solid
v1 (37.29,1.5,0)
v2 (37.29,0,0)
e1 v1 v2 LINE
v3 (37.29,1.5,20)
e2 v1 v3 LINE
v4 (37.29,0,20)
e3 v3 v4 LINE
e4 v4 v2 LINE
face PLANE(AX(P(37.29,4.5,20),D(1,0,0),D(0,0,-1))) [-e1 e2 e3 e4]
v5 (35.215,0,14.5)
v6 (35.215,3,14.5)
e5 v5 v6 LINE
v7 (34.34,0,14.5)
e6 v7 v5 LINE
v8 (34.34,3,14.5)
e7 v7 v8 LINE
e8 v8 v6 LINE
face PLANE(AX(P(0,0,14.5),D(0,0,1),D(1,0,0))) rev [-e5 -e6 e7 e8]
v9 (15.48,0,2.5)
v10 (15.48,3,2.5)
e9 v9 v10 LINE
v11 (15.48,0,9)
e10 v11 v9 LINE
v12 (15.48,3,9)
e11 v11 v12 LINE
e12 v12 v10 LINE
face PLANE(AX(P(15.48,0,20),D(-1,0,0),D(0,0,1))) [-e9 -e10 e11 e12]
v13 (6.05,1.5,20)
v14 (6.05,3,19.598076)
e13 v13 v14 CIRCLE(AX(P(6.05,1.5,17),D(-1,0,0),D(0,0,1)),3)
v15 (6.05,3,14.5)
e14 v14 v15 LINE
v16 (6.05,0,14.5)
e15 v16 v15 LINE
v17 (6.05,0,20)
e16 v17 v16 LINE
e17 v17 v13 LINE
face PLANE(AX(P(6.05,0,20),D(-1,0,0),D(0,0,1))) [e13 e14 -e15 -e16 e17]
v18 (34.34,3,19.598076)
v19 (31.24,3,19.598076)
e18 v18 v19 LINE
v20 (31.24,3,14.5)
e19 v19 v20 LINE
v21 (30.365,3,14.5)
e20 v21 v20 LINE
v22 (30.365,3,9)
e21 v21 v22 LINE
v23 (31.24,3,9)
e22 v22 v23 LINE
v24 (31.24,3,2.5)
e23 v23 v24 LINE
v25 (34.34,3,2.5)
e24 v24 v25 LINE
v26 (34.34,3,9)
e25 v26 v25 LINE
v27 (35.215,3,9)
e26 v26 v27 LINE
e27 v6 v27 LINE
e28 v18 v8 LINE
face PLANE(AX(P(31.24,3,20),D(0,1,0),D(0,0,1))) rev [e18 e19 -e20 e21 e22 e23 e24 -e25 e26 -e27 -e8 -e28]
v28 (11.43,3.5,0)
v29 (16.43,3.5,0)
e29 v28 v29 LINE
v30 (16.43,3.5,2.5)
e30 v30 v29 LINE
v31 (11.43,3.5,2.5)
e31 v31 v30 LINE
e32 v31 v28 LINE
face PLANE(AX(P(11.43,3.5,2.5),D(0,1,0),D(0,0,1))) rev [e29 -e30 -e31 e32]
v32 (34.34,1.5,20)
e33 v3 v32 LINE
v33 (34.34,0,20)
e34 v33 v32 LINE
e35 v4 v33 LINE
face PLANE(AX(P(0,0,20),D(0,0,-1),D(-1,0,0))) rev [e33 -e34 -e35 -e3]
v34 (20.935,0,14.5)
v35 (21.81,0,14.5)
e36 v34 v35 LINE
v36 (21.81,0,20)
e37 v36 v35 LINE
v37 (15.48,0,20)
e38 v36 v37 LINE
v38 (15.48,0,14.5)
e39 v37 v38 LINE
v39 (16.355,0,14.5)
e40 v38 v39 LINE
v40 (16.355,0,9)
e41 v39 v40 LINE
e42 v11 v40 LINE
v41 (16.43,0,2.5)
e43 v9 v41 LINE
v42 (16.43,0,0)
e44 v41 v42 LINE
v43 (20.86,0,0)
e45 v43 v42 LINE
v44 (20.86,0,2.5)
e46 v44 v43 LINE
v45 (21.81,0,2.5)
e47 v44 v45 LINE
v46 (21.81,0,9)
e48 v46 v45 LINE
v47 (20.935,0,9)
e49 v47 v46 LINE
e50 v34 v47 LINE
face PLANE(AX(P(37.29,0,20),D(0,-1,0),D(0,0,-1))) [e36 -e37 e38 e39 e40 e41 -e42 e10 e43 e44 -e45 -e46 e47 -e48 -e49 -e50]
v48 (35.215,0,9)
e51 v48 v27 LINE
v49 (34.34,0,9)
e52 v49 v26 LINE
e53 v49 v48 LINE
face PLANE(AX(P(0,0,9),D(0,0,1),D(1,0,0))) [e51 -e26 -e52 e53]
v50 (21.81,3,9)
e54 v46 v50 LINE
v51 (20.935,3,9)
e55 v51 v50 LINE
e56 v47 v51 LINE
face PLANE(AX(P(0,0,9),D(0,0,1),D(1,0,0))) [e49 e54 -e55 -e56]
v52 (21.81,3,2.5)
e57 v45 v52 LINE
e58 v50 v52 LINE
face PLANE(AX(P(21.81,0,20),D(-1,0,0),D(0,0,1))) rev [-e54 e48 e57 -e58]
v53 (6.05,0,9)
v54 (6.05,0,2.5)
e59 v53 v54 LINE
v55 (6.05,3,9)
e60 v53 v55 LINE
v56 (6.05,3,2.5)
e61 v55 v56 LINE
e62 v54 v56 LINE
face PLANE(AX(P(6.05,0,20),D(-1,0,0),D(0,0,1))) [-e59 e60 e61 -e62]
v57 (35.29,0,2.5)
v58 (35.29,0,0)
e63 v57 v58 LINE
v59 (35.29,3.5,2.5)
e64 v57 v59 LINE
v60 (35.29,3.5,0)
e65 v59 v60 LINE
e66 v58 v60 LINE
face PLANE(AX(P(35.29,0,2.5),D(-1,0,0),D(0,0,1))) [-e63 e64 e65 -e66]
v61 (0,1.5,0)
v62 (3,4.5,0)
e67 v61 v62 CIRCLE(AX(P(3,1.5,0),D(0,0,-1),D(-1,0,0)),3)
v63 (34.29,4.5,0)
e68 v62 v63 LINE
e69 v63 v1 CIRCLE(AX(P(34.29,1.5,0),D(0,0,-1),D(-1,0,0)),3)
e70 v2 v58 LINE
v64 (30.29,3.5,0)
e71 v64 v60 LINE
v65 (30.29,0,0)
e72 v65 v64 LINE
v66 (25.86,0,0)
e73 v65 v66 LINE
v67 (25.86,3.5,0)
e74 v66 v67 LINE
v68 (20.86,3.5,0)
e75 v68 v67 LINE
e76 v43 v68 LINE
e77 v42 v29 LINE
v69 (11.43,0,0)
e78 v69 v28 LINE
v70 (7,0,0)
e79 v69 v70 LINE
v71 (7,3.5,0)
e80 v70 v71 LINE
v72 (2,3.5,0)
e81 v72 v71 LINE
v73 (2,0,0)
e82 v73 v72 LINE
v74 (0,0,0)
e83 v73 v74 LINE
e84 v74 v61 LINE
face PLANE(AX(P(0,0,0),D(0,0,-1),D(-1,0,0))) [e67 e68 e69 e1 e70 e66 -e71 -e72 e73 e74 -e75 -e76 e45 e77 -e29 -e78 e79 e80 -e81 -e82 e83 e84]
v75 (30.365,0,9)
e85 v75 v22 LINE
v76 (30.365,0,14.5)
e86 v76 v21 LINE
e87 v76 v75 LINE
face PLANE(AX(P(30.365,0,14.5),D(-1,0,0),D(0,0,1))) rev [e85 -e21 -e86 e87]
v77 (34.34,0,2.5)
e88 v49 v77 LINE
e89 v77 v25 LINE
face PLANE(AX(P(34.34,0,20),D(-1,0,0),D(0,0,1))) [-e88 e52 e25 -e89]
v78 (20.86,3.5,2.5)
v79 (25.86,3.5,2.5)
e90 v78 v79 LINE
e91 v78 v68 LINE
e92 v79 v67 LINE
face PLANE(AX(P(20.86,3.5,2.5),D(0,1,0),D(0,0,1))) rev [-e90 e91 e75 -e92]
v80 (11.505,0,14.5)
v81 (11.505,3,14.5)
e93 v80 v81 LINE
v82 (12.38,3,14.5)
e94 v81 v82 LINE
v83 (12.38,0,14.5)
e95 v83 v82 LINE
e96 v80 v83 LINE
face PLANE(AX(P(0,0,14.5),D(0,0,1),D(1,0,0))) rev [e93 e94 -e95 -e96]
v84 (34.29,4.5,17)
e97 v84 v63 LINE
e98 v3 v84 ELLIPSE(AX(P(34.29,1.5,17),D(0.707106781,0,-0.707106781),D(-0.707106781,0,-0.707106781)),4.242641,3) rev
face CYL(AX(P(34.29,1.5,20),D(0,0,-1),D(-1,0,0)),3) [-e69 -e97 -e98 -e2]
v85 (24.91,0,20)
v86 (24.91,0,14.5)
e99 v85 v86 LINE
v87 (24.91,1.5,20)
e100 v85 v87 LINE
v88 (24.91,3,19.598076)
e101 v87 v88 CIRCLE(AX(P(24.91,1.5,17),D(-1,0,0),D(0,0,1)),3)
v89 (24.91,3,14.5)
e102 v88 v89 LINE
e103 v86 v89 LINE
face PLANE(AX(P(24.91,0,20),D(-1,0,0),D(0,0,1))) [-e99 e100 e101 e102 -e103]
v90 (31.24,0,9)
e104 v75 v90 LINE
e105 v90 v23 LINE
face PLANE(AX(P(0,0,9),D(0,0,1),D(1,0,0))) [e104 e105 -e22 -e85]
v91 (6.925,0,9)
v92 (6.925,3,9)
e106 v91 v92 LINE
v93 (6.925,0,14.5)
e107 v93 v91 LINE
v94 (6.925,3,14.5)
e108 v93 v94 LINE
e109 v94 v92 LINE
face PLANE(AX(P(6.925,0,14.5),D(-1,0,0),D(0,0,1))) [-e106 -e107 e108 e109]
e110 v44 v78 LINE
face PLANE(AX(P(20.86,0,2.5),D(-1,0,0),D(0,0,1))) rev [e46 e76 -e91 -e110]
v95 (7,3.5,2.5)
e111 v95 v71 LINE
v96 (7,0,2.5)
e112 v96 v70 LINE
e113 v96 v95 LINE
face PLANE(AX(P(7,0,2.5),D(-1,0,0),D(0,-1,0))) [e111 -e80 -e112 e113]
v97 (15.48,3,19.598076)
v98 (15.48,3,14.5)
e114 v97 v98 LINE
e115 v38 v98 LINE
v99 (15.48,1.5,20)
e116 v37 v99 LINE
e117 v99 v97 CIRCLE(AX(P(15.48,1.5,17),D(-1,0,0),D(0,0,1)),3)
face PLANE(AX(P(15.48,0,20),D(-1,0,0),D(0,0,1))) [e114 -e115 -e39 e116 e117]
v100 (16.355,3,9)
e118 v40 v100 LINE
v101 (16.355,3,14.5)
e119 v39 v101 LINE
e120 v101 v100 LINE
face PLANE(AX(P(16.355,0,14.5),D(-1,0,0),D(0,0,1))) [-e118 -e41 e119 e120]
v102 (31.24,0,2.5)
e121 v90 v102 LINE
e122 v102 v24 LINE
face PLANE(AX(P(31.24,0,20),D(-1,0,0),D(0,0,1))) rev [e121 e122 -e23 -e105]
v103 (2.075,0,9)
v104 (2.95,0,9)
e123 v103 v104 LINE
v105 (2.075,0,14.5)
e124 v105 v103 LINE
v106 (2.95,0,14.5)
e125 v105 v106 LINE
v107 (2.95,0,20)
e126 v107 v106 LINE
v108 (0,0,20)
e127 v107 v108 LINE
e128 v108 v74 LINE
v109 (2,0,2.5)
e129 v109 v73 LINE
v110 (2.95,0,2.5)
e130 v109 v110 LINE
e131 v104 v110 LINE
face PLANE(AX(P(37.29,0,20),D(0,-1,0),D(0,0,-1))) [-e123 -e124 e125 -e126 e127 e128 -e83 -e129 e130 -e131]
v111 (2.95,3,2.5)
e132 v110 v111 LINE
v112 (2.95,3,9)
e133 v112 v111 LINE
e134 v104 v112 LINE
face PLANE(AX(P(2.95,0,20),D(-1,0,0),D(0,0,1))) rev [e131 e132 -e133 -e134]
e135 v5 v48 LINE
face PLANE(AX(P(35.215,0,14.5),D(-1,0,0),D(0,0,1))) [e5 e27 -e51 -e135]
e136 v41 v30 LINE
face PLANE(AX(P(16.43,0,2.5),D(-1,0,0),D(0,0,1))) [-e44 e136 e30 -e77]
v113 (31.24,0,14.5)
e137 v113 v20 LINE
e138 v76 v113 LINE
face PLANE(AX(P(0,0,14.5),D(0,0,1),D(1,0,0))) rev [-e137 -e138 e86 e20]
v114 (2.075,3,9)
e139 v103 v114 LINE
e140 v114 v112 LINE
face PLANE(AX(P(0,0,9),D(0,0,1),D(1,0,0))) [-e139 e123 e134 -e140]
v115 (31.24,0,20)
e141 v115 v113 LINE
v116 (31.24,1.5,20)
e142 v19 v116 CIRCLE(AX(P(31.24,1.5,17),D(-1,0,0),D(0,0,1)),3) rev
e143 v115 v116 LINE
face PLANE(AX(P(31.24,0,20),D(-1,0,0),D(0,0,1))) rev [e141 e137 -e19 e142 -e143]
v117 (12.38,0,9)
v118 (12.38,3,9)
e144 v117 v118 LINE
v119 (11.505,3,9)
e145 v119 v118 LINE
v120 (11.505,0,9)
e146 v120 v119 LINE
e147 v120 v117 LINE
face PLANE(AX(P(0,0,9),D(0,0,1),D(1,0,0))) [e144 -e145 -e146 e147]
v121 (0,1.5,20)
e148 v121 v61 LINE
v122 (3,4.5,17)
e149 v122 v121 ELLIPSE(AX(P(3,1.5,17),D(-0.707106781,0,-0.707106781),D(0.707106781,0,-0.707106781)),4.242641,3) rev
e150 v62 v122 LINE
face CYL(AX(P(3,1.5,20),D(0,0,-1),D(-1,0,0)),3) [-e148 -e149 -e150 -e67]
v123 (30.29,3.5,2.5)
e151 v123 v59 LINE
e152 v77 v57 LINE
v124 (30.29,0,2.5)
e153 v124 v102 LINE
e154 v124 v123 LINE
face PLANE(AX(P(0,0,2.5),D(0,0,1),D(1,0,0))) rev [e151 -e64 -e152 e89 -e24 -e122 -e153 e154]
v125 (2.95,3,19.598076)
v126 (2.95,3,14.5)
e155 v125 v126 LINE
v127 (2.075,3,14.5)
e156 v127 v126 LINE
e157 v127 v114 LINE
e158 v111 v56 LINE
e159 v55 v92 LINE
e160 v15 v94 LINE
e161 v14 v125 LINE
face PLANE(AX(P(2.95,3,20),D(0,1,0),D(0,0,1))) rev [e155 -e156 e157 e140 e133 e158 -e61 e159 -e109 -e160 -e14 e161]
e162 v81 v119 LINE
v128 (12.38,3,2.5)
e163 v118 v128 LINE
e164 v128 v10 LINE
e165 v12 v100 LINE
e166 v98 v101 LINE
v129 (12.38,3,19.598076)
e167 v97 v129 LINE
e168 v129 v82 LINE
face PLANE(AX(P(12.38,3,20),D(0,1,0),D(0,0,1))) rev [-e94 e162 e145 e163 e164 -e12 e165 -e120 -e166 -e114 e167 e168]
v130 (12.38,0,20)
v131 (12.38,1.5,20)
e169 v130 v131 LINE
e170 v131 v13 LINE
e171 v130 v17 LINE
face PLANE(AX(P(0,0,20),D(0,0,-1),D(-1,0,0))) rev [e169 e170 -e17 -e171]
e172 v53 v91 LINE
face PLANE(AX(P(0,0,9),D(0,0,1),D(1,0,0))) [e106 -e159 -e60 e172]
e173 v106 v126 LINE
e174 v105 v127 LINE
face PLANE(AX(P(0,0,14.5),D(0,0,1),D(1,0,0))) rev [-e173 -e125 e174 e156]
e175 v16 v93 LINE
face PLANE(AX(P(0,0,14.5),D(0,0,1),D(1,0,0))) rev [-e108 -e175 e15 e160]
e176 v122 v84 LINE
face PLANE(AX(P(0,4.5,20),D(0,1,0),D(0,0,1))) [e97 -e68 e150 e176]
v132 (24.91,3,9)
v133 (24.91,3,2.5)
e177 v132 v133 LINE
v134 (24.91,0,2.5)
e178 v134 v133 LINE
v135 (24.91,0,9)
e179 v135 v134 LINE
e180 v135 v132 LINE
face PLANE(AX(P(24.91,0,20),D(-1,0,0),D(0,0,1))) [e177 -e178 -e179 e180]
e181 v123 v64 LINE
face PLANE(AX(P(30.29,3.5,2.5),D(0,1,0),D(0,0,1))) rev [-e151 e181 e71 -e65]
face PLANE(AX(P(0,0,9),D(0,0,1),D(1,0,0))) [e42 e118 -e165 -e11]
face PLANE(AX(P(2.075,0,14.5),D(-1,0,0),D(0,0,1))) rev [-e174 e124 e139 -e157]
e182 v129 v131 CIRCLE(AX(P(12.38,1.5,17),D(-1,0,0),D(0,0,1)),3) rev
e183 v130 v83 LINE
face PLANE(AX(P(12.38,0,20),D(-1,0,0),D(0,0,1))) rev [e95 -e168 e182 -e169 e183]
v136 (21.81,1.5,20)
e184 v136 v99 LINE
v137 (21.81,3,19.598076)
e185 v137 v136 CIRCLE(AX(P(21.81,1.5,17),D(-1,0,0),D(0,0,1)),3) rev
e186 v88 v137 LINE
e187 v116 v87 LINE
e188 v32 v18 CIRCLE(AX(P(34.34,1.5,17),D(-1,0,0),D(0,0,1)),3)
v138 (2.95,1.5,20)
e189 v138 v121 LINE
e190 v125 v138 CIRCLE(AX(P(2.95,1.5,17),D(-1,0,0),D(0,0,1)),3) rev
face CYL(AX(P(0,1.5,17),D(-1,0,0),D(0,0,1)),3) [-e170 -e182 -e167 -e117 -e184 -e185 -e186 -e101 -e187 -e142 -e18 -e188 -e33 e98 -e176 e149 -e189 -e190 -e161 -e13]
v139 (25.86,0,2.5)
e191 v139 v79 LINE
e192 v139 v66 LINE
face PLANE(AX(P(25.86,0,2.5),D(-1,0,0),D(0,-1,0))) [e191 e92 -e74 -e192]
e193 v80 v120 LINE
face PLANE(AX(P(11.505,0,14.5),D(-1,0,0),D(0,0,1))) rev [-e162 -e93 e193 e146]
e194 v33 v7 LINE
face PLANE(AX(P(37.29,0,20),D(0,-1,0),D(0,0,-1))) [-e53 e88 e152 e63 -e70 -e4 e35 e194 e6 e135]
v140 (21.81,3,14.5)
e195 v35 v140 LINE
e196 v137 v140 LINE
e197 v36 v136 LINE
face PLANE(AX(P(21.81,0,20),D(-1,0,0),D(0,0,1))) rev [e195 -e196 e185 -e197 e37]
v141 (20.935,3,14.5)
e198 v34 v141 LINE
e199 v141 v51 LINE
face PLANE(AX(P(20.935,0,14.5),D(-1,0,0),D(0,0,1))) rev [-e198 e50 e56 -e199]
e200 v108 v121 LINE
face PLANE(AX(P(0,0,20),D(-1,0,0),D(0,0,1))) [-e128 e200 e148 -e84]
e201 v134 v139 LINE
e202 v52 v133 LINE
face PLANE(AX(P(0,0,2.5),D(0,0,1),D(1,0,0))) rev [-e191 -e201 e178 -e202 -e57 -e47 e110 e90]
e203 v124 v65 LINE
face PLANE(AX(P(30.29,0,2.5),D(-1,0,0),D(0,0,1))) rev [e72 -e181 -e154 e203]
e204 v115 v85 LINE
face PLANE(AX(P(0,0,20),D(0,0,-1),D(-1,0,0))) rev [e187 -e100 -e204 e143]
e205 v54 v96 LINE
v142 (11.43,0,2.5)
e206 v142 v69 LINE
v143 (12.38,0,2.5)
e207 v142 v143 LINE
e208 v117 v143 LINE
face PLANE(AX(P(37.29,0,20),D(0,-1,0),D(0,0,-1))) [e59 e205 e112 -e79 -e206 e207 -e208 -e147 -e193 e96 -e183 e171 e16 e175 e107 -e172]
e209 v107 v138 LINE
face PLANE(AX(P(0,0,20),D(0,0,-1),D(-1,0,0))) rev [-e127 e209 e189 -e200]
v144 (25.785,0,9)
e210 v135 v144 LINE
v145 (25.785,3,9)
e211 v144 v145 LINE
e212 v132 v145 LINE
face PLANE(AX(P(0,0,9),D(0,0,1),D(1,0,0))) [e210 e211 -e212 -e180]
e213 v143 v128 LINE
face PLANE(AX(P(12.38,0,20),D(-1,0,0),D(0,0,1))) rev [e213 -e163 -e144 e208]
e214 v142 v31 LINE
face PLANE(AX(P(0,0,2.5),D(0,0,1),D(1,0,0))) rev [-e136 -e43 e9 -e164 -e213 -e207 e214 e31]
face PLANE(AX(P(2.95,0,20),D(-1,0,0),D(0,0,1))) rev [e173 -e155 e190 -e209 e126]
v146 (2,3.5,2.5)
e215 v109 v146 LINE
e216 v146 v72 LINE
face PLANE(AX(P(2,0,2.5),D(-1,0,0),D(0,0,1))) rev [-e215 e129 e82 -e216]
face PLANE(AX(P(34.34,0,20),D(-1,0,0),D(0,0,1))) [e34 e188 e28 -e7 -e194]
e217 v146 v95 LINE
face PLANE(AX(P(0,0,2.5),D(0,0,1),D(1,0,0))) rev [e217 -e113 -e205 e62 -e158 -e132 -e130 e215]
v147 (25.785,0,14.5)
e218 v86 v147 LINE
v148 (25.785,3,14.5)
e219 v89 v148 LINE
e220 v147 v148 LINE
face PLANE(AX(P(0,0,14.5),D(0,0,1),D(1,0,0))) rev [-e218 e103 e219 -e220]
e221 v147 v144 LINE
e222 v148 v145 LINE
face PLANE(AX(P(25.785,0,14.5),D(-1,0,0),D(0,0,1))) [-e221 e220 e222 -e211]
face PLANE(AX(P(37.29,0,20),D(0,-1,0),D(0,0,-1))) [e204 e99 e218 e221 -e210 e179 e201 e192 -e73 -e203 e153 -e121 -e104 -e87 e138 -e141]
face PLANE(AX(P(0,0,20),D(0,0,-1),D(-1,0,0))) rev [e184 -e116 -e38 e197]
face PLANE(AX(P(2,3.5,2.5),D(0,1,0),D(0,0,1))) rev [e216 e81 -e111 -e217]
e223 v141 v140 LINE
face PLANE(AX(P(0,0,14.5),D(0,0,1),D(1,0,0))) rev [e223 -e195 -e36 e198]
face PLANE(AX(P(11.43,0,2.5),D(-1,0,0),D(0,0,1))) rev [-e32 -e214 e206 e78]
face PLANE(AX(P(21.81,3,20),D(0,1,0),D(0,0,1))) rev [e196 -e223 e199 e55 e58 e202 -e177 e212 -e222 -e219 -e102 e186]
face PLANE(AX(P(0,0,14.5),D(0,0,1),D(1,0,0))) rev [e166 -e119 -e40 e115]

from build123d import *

# Parameters (mm, degrees)
SKETCH1_W               = 37.29
SKETCH1_H               = 4.5
BOSS_EXTRUDE1_DEPTH     = 20
CUT_EXTRUDE1_DEPTH      = 43.553426419
CUT_EXTRUDE1_DEPTH_BACK = 43.553426419
SKETCH1_3_W             = 3.1
SKETCH1_3_H             = 3
CUT_EXTRUDE2_START      = 9
SKETCH1_4_W             = 4.85
SKETCH1_4_H             = 3
CUT_EXTRUDE2_DEPTH      = 5.5
SKETCH1_5_W             = 5
SKETCH1_5_H             = 3.5
CUT_EXTRUDE3_DEPTH      = 2.5
FILLET1_R               = 3


with BuildPart() as part:
    # Sketch1 → Boss-Extrude1 (new body)
    with BuildSketch(Plane.XY):
        with Locations((18.645, 2.25)):
            Rectangle(SKETCH1_W, SKETCH1_H)
    extrude(amount=BOSS_EXTRUDE1_DEPTH)

    # Sketch1<3> → Cut-Extrude1 (cut, two sides: drawn at the far end of the back side and taken through both)
    with BuildSketch(Plane.XY.offset(-CUT_EXTRUDE1_DEPTH_BACK)):
        with Locations((4.5, 1.5)):
            Rectangle(SKETCH1_3_W, SKETCH1_3_H)
        with Locations((13.93, 1.5)):
            Rectangle(SKETCH1_3_W, SKETCH1_3_H)
        with Locations((23.36, 1.5)):
            Rectangle(SKETCH1_3_W, SKETCH1_3_H)
        with Locations((32.79, 1.5)):
            Rectangle(SKETCH1_3_W, SKETCH1_3_H)
    extrude(amount=CUT_EXTRUDE1_DEPTH + CUT_EXTRUDE1_DEPTH_BACK, mode=Mode.SUBTRACT)

    # Sketch1<4> → Cut-Extrude2 (cut)
    with BuildSketch(Plane.XY.offset(CUT_EXTRUDE2_START)):
        with Locations((4.5, 1.5)):
            Rectangle(SKETCH1_4_W, SKETCH1_4_H)
        with Locations((13.93, 1.5)):
            Rectangle(SKETCH1_4_W, SKETCH1_4_H)
        with Locations((23.36, 1.5)):
            Rectangle(SKETCH1_4_W, SKETCH1_4_H)
        with Locations((32.79, 1.5)):
            Rectangle(SKETCH1_4_W, SKETCH1_4_H)
    extrude(amount=CUT_EXTRUDE2_DEPTH, mode=Mode.SUBTRACT)

    # Sketch1<5> → Cut-Extrude3 (cut)
    with BuildSketch(Plane.XY):
        with Locations((4.5, 1.75)):
            Rectangle(SKETCH1_5_W, SKETCH1_5_H)
        with Locations((13.93, 1.75)):
            Rectangle(SKETCH1_5_W, SKETCH1_5_H)
        with Locations((23.36, 1.75)):
            Rectangle(SKETCH1_5_W, SKETCH1_5_H)
        with Locations((32.79, 1.75)):
            Rectangle(SKETCH1_5_W, SKETCH1_5_H)
    extrude(amount=CUT_EXTRUDE3_DEPTH, mode=Mode.SUBTRACT)

    # Fillet1
    # the kernel refuses this fillet: 3 mm, written as the material it takes off along each edge
    with BuildSketch(Plane(origin=(-7.5, 4.5, 20), x_dir=(0, 0, -1), z_dir=(1, 0, 0))) as fillet1_piece_1:
        with BuildLine():
            CenterArc((FILLET1_R, -FILLET1_R), FILLET1_R, 90, 90)
            Line((0, -FILLET1_R), (0, 0))
            Line((0, 0), (FILLET1_R, 0))
        make_face()
    extrude(amount=52.29, mode=Mode.SUBTRACT)
    with BuildSketch(Plane(origin=(37.29, 4.5, -7.5), x_dir=(-1, 0, 0), z_dir=(0, 0, 1)), Plane(origin=(0, 4.5, -7.5), x_dir=(0, -1, 0), z_dir=(0, 0, 1))) as fillet1_piece_2:
        with BuildLine():
            CenterArc((FILLET1_R, FILLET1_R), FILLET1_R, 180, 90)
            Line((0, FILLET1_R), (0, 0))
            Line((0, 0), (FILLET1_R, 0))
        make_face()
    extrude(amount=35, mode=Mode.SUBTRACT)


solid = part.part
